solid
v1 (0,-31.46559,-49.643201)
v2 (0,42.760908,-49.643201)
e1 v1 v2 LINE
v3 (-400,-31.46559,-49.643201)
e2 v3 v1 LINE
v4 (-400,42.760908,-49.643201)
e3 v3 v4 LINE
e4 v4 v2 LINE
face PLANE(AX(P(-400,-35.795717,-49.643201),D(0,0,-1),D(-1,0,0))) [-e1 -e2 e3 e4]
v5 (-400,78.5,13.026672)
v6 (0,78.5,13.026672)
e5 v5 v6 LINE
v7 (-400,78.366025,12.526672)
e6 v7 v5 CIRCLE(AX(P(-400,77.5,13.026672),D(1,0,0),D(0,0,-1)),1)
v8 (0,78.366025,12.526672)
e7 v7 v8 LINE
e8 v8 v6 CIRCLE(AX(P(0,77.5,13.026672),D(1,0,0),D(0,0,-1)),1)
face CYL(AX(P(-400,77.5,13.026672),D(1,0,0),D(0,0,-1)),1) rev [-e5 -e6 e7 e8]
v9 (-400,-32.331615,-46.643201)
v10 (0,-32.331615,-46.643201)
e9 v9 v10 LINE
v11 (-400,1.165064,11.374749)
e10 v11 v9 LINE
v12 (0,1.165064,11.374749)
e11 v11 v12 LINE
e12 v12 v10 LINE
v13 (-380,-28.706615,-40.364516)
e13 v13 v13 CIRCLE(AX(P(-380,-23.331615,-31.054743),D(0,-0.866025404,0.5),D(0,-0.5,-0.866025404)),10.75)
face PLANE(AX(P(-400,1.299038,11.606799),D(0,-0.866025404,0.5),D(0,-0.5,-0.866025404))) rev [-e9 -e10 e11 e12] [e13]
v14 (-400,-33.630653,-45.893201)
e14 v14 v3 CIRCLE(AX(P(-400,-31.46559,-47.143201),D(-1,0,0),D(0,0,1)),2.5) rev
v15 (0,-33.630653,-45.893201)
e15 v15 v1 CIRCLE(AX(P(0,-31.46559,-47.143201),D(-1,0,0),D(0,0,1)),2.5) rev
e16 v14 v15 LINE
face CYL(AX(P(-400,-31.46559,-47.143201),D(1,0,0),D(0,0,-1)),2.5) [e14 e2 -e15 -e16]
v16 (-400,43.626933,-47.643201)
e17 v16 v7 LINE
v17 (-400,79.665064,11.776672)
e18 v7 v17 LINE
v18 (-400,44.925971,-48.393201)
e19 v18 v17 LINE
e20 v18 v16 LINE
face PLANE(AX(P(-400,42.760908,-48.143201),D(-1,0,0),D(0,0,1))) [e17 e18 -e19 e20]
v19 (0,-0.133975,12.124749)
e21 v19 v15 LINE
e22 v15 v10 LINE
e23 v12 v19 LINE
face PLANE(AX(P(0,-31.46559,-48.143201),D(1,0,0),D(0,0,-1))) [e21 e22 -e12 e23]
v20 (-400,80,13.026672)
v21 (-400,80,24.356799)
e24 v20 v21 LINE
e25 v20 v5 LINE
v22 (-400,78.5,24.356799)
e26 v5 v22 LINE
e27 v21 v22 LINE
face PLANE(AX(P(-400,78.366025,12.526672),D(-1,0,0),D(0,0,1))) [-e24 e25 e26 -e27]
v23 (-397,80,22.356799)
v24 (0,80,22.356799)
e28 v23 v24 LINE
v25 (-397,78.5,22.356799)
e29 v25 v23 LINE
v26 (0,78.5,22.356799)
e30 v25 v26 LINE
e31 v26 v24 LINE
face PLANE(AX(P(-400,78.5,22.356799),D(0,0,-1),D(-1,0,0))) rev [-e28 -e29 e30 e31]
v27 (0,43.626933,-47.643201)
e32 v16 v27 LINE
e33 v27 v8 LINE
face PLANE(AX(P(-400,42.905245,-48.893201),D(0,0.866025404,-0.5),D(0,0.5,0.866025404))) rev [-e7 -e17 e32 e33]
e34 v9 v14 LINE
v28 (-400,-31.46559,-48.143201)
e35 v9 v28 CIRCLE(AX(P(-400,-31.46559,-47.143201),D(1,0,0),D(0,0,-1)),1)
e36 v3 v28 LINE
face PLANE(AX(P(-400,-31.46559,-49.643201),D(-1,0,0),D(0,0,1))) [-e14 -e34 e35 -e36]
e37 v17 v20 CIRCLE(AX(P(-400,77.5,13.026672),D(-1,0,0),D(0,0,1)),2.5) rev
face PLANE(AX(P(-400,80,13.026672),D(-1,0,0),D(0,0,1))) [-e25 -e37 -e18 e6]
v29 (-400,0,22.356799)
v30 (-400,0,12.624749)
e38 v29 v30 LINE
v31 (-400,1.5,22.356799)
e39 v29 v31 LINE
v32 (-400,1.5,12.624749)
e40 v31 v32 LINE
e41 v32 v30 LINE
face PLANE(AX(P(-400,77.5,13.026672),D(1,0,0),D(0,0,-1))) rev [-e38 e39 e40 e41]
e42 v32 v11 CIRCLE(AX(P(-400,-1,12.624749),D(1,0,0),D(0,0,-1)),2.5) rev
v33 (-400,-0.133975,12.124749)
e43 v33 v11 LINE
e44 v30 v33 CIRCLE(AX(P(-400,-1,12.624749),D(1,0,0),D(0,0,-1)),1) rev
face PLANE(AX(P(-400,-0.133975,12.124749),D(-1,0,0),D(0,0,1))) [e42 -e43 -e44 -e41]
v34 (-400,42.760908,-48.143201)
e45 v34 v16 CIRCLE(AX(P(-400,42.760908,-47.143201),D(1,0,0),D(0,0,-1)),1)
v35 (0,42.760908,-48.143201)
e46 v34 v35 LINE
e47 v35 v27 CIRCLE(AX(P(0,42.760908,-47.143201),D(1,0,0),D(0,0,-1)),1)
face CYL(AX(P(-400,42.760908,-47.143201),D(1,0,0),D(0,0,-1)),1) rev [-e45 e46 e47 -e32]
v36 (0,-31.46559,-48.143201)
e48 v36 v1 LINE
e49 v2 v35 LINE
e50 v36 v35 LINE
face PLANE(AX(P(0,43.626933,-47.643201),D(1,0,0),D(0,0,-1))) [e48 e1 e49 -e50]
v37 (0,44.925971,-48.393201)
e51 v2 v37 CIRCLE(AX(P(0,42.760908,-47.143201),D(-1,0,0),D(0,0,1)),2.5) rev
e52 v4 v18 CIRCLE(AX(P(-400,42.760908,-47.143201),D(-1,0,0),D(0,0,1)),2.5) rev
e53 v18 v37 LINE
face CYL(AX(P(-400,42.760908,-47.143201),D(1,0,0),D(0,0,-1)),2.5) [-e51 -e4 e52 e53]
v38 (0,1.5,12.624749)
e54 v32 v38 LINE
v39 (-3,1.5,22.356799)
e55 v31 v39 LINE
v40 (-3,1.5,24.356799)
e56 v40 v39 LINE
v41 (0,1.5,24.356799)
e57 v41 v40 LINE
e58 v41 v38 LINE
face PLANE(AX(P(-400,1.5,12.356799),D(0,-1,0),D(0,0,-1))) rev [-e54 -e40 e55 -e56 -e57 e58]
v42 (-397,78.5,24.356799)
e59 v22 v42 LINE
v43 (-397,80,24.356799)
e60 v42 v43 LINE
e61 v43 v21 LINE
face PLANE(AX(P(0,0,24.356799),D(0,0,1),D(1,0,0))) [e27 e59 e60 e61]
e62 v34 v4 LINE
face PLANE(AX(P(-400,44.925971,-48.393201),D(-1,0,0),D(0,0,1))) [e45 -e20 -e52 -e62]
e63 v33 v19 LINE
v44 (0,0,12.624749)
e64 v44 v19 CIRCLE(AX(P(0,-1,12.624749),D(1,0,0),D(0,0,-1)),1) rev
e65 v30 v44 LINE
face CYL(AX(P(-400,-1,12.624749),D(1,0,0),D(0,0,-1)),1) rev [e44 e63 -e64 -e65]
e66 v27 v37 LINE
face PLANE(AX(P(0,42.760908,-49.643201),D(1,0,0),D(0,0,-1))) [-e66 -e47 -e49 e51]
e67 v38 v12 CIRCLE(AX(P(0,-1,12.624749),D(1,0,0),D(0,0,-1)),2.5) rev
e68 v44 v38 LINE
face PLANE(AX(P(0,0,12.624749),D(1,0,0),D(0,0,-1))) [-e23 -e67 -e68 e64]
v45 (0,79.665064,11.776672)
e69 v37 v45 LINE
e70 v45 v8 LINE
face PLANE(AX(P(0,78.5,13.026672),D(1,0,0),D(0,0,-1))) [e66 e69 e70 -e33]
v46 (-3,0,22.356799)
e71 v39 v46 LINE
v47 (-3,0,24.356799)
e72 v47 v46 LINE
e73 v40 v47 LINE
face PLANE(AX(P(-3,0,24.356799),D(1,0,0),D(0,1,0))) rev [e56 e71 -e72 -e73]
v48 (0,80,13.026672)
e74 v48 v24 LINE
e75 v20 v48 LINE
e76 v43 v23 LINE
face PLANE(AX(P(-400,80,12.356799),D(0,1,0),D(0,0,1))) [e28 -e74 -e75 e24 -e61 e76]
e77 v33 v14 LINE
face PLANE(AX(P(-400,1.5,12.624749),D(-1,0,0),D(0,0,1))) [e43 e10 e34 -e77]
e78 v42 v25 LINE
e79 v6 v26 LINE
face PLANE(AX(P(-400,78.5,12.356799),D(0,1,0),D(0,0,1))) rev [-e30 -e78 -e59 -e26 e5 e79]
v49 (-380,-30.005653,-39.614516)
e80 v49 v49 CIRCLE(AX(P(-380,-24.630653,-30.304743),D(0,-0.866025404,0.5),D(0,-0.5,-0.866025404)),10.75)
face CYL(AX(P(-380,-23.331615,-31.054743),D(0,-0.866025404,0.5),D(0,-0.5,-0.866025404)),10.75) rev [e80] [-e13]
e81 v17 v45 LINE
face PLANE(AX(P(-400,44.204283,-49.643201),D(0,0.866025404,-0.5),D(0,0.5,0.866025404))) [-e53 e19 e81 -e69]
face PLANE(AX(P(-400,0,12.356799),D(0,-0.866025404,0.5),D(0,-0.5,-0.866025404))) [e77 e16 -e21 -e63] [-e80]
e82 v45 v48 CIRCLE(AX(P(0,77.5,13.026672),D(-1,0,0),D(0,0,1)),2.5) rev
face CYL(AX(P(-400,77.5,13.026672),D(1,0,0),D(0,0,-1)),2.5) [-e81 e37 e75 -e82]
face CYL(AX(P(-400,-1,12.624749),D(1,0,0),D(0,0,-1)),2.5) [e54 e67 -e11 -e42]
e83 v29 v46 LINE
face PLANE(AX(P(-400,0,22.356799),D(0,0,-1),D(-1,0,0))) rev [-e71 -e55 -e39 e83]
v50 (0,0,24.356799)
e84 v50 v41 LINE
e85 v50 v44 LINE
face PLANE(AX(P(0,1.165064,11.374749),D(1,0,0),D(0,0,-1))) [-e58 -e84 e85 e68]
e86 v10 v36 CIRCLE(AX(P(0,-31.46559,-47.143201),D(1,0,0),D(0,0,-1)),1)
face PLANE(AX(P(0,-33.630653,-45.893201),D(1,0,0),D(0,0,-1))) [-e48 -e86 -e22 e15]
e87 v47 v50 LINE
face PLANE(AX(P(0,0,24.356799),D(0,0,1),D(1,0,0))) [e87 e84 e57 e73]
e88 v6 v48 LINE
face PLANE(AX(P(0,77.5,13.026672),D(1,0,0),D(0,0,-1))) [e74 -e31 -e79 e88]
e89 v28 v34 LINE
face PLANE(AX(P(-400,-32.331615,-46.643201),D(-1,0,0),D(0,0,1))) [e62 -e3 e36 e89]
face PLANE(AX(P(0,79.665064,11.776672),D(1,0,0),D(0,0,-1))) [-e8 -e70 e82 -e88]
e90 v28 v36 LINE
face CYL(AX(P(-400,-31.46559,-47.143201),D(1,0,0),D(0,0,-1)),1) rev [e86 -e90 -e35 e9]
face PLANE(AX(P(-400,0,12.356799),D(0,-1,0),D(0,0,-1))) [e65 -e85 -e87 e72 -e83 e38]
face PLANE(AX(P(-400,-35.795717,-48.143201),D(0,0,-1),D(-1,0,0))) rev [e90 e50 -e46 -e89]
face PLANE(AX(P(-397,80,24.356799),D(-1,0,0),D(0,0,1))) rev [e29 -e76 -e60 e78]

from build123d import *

# Parameters (mm, degrees)
SM_BASE_FLANGE_1_DEPTH = 400
SKETCH_7_W             = 3
SKETCH_7_H             = 1.5
EXTRUDE_1_DEPTH        = 2
SKETCH_9_R             = 10.75
CUT_EXTRUDE_2_DEPTH    = 10


# Sheet-metal steps are written as plain solids
with BuildPart() as part:
    # Sketch 1 → Базовая кромка1 (new body)
    with BuildSketch(Plane(origin=(0, 0, 0), x_dir=(0, 0, -1), z_dir=(1, 0, 0))):
        with BuildLine():
            Line((-22.356799498, 0), (-12.62474869, 0))
            ThreePointArc((-12.62474869, 0), (-12.365929645, -0.034074174), (-12.12474869, -0.133974596))
            Line((-12.12474869, -0.133974596), (45.893200502, -33.63065318))
            ThreePointArc((45.893200502, -33.63065318), (48.393200502, -33.63065318), (49.643200502, -31.465589671))
            Line((49.643200502, -31.465589671), (49.643200502, 42.760907637))
            ThreePointArc((49.643200502, 42.760907637), (49.308264012, 44.010907637), (48.393200502, 44.925971147))
            Line((48.393200502, 44.925971147), (-11.776672479, 79.665063509))
            ThreePointArc((-11.776672479, 79.665063509), (-12.379624866, 79.914814566), (-13.026672479, 80))
            Line((-13.026672479, 80), (-22.356799498, 80))
            Line((-22.356799498, 80), (-22.356799498, 78.5))
            Line((-22.356799498, 78.5), (-13.026672479, 78.5))
            ThreePointArc((-13.026672479, 78.5), (-12.767853434, 78.465925826), (-12.526672479, 78.366025404))
            Line((-12.526672479, 78.366025404), (47.643200502, 43.626933041))
            ThreePointArc((47.643200502, 43.626933041), (48.009225906, 43.260907637), (48.143200502, 42.760907637))
            Line((48.143200502, 42.760907637), (48.143200502, -31.465589671))
            ThreePointArc((48.143200502, -31.465589671), (47.643200502, -32.331615075), (46.643200502, -32.331615075))
            Line((46.643200502, -32.331615075), (-11.37474869, 1.165063509))
            ThreePointArc((-11.37474869, 1.165063509), (-11.977701077, 1.414814566), (-12.62474869, 1.5))
            Line((-12.62474869, 1.5), (-22.356799498, 1.5))
            Line((-22.356799498, 1.5), (-22.356799498, 0))
        make_face()
    extrude(amount=-SM_BASE_FLANGE_1_DEPTH)

    # Эскиз7 → Бобышка-Вытянуть1 (add)
    with BuildSketch(Plane.XY.offset(22.356799498)):
        with Locations((-398.5, 79.25)):
            Rectangle(SKETCH_7_W, SKETCH_7_H)
        with Locations((-1.5, 0.75)):
            Rectangle(SKETCH_7_W, SKETCH_7_H)
    extrude(amount=EXTRUDE_1_DEPTH)

    # Эскиз9 → Вырез-Вытянуть2 (cut)
    with BuildSketch(Plane(origin=(0, -5.350651137, 3.089199874), x_dir=(1, 0, 0), z_dir=(0, -0.86602540378444, 0.49999999999999756))):
        with Locations(Location((-380, -38.560004086, 0), (0, 0, 270))):
            Circle(SKETCH_9_R)
    extrude(amount=-CUT_EXTRUDE_2_DEPTH, mode=Mode.SUBTRACT)


solid = part.part
